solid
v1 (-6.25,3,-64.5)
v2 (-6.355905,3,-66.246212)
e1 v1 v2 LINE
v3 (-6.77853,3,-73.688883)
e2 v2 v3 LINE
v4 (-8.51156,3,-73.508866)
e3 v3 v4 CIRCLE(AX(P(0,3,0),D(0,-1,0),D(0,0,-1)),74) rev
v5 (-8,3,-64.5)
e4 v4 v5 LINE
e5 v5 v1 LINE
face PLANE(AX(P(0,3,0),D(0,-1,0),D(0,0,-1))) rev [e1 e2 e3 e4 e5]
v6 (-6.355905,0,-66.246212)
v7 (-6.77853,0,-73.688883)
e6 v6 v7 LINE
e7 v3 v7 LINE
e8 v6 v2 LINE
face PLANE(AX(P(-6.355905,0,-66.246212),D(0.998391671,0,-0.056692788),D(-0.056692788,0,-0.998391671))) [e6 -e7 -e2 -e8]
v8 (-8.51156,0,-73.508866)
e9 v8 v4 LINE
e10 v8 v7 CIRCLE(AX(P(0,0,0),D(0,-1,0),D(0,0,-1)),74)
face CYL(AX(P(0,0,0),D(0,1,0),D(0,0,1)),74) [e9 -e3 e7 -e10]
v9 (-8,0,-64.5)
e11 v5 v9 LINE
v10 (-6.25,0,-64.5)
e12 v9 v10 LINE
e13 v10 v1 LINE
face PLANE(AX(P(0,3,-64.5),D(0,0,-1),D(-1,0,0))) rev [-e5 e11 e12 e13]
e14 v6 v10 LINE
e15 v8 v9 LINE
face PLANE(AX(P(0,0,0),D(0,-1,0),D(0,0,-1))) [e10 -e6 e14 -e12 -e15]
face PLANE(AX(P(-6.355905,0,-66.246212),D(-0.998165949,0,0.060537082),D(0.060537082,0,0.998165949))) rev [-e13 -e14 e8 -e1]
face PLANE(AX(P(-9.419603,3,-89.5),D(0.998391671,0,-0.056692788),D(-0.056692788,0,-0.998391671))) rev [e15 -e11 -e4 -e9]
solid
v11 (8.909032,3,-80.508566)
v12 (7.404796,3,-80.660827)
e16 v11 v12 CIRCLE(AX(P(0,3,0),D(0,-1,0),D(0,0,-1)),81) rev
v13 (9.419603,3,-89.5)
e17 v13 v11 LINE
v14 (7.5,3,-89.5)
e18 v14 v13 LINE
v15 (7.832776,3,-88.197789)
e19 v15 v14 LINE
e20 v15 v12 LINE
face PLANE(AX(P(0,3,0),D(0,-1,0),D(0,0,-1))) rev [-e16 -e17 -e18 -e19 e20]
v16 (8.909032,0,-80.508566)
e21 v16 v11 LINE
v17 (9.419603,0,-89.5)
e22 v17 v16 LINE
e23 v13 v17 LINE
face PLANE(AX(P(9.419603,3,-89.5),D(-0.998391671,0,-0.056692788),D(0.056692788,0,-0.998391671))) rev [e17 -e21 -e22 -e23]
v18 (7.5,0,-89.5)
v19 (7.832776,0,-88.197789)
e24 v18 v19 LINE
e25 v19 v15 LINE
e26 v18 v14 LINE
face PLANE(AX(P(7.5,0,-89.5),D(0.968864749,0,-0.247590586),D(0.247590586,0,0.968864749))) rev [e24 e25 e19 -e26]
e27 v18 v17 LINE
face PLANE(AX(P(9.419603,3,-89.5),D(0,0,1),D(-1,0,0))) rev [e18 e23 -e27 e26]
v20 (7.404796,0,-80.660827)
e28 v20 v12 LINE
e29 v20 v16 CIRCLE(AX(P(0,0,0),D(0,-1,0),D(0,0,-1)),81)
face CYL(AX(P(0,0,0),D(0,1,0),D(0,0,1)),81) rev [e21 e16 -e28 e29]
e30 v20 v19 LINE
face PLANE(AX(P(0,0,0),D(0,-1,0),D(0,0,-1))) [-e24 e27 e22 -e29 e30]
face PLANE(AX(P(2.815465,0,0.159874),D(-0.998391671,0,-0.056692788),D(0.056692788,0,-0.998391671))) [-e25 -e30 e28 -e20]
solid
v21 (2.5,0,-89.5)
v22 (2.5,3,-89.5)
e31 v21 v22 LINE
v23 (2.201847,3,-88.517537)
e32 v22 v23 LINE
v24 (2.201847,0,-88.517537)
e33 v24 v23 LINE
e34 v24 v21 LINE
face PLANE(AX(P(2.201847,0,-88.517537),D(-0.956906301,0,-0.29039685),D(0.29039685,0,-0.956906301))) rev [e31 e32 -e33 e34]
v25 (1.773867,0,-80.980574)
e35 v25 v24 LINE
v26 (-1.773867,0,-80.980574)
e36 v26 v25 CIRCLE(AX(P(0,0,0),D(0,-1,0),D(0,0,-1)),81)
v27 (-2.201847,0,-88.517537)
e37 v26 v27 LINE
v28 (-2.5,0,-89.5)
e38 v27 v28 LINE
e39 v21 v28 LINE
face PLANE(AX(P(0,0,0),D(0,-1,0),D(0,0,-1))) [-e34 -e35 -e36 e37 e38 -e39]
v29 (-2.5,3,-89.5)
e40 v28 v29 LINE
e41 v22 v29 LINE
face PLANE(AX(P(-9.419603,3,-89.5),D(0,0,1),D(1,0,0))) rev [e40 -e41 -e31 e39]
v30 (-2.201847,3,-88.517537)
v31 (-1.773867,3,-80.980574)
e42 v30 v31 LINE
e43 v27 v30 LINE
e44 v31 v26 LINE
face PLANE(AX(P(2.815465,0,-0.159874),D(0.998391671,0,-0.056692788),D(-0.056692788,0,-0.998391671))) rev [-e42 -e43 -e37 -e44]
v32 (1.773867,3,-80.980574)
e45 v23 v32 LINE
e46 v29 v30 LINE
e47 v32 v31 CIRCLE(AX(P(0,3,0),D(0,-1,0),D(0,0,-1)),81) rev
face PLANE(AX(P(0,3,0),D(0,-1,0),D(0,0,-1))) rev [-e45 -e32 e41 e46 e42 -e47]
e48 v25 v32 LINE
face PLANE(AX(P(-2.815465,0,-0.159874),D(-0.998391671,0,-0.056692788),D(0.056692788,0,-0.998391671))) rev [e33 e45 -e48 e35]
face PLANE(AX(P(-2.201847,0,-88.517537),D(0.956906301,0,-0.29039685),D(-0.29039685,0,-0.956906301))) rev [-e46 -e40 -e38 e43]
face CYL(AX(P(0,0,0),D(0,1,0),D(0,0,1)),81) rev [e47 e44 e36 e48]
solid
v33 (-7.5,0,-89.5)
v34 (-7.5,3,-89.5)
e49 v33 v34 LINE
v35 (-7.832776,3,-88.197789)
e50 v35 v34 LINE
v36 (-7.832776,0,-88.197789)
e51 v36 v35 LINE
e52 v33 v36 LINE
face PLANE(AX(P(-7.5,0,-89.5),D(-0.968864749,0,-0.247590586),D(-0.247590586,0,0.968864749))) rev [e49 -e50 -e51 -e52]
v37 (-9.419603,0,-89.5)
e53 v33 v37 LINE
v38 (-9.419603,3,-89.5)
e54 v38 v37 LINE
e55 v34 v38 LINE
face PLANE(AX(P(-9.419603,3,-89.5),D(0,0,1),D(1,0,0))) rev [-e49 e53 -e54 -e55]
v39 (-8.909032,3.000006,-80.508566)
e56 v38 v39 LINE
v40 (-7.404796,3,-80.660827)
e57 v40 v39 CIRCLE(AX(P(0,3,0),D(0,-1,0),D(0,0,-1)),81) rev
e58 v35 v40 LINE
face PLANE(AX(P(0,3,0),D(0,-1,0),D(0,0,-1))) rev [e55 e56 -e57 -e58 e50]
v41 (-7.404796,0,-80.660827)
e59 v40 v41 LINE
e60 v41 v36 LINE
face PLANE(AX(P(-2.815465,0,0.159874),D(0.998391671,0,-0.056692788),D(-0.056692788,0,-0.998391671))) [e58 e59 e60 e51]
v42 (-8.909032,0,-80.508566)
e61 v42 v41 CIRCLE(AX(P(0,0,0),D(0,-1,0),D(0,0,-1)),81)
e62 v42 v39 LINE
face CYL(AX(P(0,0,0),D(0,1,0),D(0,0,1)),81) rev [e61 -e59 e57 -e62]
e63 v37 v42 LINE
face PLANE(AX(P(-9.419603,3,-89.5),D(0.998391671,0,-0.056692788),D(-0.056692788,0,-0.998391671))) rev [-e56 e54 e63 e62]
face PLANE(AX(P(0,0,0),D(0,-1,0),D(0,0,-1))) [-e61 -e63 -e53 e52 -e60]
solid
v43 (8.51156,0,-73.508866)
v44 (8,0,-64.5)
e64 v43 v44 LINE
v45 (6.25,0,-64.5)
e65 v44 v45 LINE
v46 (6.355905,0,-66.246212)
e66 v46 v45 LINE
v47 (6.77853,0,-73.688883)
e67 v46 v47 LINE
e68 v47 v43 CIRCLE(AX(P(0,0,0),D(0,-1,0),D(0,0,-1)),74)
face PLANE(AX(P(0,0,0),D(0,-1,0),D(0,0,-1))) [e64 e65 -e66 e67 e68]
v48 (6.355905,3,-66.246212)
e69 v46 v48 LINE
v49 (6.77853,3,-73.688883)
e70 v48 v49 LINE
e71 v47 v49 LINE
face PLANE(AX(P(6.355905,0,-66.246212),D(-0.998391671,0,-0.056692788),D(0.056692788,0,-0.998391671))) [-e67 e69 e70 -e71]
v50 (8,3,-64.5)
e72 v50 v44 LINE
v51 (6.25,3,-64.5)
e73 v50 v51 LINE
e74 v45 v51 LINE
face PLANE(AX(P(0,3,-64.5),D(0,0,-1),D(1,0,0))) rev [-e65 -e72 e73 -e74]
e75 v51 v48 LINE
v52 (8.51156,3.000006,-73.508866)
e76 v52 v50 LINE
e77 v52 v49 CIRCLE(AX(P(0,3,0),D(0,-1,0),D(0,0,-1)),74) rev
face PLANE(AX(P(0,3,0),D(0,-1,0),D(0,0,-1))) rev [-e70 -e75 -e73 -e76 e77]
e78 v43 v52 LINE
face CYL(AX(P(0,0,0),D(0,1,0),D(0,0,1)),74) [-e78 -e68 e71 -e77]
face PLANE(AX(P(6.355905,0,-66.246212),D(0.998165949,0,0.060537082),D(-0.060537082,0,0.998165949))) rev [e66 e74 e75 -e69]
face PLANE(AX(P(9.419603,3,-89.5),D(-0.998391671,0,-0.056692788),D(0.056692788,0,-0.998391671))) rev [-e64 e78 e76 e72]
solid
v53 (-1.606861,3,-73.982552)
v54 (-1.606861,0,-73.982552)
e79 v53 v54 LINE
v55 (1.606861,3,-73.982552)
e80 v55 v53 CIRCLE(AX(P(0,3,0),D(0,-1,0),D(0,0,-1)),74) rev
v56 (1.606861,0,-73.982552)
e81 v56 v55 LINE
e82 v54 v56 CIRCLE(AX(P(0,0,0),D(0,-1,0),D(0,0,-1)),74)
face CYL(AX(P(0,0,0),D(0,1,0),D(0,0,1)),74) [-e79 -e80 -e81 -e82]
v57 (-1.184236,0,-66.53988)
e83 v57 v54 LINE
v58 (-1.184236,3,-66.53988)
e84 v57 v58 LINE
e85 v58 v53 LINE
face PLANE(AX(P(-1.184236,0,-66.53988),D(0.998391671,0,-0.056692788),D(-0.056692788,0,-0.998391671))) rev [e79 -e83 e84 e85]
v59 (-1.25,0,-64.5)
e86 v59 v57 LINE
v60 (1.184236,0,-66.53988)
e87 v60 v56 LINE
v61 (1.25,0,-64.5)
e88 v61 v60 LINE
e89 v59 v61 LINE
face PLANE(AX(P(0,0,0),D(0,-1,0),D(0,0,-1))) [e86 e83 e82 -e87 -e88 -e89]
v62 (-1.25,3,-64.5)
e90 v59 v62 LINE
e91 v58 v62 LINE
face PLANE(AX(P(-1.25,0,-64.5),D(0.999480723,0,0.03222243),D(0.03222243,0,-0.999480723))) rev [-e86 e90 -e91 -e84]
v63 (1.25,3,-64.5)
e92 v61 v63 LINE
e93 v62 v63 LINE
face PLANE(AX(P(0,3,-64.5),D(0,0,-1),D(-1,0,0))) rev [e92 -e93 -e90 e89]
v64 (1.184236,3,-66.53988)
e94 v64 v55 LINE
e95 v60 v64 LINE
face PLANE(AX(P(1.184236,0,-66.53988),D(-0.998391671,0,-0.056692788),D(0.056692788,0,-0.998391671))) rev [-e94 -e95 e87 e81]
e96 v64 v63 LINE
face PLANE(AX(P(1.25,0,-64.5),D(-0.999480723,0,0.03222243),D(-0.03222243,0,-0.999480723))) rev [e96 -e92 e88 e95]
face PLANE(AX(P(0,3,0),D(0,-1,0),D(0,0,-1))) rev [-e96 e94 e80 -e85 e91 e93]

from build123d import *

# Parameters (mm, degrees)
BOSS_EXTRUDE1_DEPTH      = 3
CUT_EXTRUDE1_DEPTH       = 91.044316414
BOSS_EXTRUDE2_DEPTH      = 3
CUT_EXTRUDE7_DEPTH       = 91.044316414
CUT_EXTRUDE9_DEPTH       = 91.044316414
MIRROR10_DEPTH           = 3
CUT_EXTRUDE10_DEPTH      = 91.044316414
CUT_EXTRUDE10_DEPTH_BACK = 91.044316414


# Read off the part's stored shape, not the designer's step: Mirror10
with BuildPart() as part:
    # Sketch1 → Boss-Extrude1 (new body)
    with BuildSketch(Plane(origin=(0, 0, 0), x_dir=(1, 0, 0), z_dir=(0, 1, 0))):
        Polygon((-9.419602878, 89.5), (-8, 64.5), (0, 64.5), (0, 89.5), align=None)
    extrude(amount=BOSS_EXTRUDE1_DEPTH)

    # Sketch2 → Cut-Extrude1 (cut, symmetric)
    with BuildSketch(Plane(origin=(0, 3, 0), x_dir=(1, 0, 0), z_dir=(0, 1, 0))):
        Polygon((-6.585534884, 66.233172431), (-0.954605862, 66.552919753), (-2.201847188, 88.517536505), (-7.83277621, 88.197789183), align=None)
    extrude(amount=CUT_EXTRUDE1_DEPTH, both=True, mode=Mode.SUBTRACT)

    # Sketch6 → Boss-Extrude2 (add)
    with BuildSketch(Plane(origin=(0, 3, 0), x_dir=(1, 0, 0), z_dir=(0, 1, 0))):
        Polygon((-6.585534884, 66.233172431), (-6.3559048, 66.246211772), (-6.866139888, 75.231736807), (-7.322541122, 79.212264148), align=None)
    boss_extrude2 = extrude(amount=-BOSS_EXTRUDE2_DEPTH)

    # Mirror3: Boss-Extrude2 across plane
    add(boss_extrude2.mirror(Plane(origin=(0, 0, 0), x_dir=(0.05669278756337804, 0, 0.9983916705573488), z_dir=(0.9983916705573489, 0, -0.05669278756337803))))

    # Sketch7 → Cut-Extrude7 (cut, symmetric)
    with BuildSketch(Plane(origin=(0, 3, 0), x_dir=(1, 0, 0), z_dir=(0, 1, 0))):
        Polygon((-7.5, 89.5), (-7.83277621, 88.197789183), (-2.201847188, 88.517536505), (-2.5, 89.5), align=None)
    extrude(amount=CUT_EXTRUDE7_DEPTH, both=True, mode=Mode.SUBTRACT)

    # Sketch14 → Cut-Extrude9 (cut, symmetric)
    with BuildSketch(Plane(origin=(0, 3, 0), x_dir=(1, 0, 0), z_dir=(0, 1, 0))):
        Polygon((-6.3559048, 66.246211772), (-6.25, 64.5), (-1.25, 64.5), (-1.184235946, 66.539880412), align=None)
    extrude(amount=CUT_EXTRUDE9_DEPTH, both=True, mode=Mode.SUBTRACT)


with BuildPart() as cut_extrude9_piece_1:
    # of the separate pieces the step leaves, piece 1, a body of its own (cut_extrude9_pieces)
    add(part.part.solids().sort_by_distance((-1.25, 0, -64.5))[0])

    # Mirror10 outline → Mirror10 (add)
    with BuildSketch(Plane(origin=(0, 0, 0), x_dir=(1, 0, 0), z_dir=(0, 1, 0))):
        Polygon((0, 64.5), (1.25, 64.5), (1.184235946, 66.539880412), (1.694471034, 75.525405447), (1.6916121, 79.53201147), (2.201847188, 88.517536505), (2.5, 89.5), (0, 89.5), align=None)
    extrude(amount=MIRROR10_DEPTH)


with BuildPart() as cut_extrude9_piece_2:
    # of the separate pieces the step leaves, piece 2, a body of its own (cut_extrude9_pieces)
    add(part.part.solids().sort_by_distance((-9.419602878, 0, -89.5))[0])


with BuildPart() as body_3:
    # Mirror12: mirrored copy
    add(cut_extrude9_piece_2.part.mirror(Plane(origin=(0, 0, 0), x_dir=(0, 0, 1), z_dir=(1, 0, 0))))


with BuildPart() as cut_extrude10_tool:
    # Sketch15 → Cut-Extrude10 (new, two sides: drawn at the far end of the back side and taken through both)
    with BuildSketch(Plane(origin=(0, 3, 0), x_dir=(1, 0, 0), z_dir=(0, 1, 0)).offset(-CUT_EXTRUDE10_DEPTH_BACK)):
        with BuildLine():
            Line((-8.511560468, 73.508865713), (-8.909032235, 80.50856566))
            ThreePointArc((-8.909032235, 80.50856566), (0, 81), (8.909032235, 80.50856566))
            Line((8.909032235, 80.50856566), (8.511560468, 73.508865713))
            ThreePointArc((8.511560468, 73.508865713), (0, 74), (-8.511560468, 73.508865713))
        make_face()
    extrude(amount=CUT_EXTRUDE10_DEPTH + CUT_EXTRUDE10_DEPTH_BACK)


with BuildPart() as cut_extrude9_piece_1_1:
    add(cut_extrude9_piece_1.part)

    # Cut-Extrude10: cut by cut_extrude10_tool
    add(cut_extrude10_tool.part, mode=Mode.SUBTRACT)


with BuildPart() as cut_extrude9_piece_2_1:
    add(cut_extrude9_piece_2.part)

    # Cut-Extrude10: cut by cut_extrude10_tool
    add(cut_extrude10_tool.part, mode=Mode.SUBTRACT)


with BuildPart() as body_3_1:
    add(body_3.part)

    # Cut-Extrude10: cut by cut_extrude10_tool
    add(cut_extrude10_tool.part, mode=Mode.SUBTRACT)


with BuildPart() as cut_extrude10_piece_1:
    # of the separate pieces the step leaves, piece 1, a body of its own (cut_extrude10_pieces)
    add(cut_extrude9_piece_1_1.part.solids().sort_by_distance((-1.773867452, 0, -80.980574178))[0])


with BuildPart() as cut_extrude10_piece_2:
    # of the separate pieces the step leaves, piece 2, a body of its own (cut_extrude10_pieces)
    add(cut_extrude9_piece_1_1.part.solids().sort_by_distance((-1.25, 0, -64.5))[0])


with BuildPart() as cut_extrude10_piece_1_of_cut_extrude9_pi:
    # of the separate pieces the step leaves, piece 1, a body of its own (cut_extrude10_pieces_of_cut_extrude9_pie)
    add(cut_extrude9_piece_2_1.part.solids().sort_by_distance((-8.511560468, 0, -73.508865713))[0])


with BuildPart() as cut_extrude10_piece_2_of_cut_extrude9_pi:
    # of the separate pieces the step leaves, piece 2, a body of its own (cut_extrude10_pieces_of_cut_extrude9_pie)
    add(cut_extrude9_piece_2_1.part.solids().sort_by_distance((-9.419602878, 0, -89.5))[0])


with BuildPart() as cut_extrude10_piece_1_of_body_3:
    # of the separate pieces the step leaves, piece 1, a body of its own (cut_extrude10_pieces_of_body_3)
    add(body_3_1.part.solids().sort_by_distance((8.511560468, 0, -73.508865713))[0])


with BuildPart() as cut_extrude10_piece_2_of_body_3:
    # of the separate pieces the step leaves, piece 2, a body of its own (cut_extrude10_pieces_of_body_3)
    add(body_3_1.part.solids().sort_by_distance((9.419602878, 0, -89.5))[0])


solid = Compound([cut_extrude10_piece_1.part, cut_extrude10_piece_2.part, cut_extrude10_piece_1_of_cut_extrude9_pi.part, cut_extrude10_piece_2_of_cut_extrude9_pi.part, cut_extrude10_piece_1_of_body_3.part, cut_extrude10_piece_2_of_body_3.part])
